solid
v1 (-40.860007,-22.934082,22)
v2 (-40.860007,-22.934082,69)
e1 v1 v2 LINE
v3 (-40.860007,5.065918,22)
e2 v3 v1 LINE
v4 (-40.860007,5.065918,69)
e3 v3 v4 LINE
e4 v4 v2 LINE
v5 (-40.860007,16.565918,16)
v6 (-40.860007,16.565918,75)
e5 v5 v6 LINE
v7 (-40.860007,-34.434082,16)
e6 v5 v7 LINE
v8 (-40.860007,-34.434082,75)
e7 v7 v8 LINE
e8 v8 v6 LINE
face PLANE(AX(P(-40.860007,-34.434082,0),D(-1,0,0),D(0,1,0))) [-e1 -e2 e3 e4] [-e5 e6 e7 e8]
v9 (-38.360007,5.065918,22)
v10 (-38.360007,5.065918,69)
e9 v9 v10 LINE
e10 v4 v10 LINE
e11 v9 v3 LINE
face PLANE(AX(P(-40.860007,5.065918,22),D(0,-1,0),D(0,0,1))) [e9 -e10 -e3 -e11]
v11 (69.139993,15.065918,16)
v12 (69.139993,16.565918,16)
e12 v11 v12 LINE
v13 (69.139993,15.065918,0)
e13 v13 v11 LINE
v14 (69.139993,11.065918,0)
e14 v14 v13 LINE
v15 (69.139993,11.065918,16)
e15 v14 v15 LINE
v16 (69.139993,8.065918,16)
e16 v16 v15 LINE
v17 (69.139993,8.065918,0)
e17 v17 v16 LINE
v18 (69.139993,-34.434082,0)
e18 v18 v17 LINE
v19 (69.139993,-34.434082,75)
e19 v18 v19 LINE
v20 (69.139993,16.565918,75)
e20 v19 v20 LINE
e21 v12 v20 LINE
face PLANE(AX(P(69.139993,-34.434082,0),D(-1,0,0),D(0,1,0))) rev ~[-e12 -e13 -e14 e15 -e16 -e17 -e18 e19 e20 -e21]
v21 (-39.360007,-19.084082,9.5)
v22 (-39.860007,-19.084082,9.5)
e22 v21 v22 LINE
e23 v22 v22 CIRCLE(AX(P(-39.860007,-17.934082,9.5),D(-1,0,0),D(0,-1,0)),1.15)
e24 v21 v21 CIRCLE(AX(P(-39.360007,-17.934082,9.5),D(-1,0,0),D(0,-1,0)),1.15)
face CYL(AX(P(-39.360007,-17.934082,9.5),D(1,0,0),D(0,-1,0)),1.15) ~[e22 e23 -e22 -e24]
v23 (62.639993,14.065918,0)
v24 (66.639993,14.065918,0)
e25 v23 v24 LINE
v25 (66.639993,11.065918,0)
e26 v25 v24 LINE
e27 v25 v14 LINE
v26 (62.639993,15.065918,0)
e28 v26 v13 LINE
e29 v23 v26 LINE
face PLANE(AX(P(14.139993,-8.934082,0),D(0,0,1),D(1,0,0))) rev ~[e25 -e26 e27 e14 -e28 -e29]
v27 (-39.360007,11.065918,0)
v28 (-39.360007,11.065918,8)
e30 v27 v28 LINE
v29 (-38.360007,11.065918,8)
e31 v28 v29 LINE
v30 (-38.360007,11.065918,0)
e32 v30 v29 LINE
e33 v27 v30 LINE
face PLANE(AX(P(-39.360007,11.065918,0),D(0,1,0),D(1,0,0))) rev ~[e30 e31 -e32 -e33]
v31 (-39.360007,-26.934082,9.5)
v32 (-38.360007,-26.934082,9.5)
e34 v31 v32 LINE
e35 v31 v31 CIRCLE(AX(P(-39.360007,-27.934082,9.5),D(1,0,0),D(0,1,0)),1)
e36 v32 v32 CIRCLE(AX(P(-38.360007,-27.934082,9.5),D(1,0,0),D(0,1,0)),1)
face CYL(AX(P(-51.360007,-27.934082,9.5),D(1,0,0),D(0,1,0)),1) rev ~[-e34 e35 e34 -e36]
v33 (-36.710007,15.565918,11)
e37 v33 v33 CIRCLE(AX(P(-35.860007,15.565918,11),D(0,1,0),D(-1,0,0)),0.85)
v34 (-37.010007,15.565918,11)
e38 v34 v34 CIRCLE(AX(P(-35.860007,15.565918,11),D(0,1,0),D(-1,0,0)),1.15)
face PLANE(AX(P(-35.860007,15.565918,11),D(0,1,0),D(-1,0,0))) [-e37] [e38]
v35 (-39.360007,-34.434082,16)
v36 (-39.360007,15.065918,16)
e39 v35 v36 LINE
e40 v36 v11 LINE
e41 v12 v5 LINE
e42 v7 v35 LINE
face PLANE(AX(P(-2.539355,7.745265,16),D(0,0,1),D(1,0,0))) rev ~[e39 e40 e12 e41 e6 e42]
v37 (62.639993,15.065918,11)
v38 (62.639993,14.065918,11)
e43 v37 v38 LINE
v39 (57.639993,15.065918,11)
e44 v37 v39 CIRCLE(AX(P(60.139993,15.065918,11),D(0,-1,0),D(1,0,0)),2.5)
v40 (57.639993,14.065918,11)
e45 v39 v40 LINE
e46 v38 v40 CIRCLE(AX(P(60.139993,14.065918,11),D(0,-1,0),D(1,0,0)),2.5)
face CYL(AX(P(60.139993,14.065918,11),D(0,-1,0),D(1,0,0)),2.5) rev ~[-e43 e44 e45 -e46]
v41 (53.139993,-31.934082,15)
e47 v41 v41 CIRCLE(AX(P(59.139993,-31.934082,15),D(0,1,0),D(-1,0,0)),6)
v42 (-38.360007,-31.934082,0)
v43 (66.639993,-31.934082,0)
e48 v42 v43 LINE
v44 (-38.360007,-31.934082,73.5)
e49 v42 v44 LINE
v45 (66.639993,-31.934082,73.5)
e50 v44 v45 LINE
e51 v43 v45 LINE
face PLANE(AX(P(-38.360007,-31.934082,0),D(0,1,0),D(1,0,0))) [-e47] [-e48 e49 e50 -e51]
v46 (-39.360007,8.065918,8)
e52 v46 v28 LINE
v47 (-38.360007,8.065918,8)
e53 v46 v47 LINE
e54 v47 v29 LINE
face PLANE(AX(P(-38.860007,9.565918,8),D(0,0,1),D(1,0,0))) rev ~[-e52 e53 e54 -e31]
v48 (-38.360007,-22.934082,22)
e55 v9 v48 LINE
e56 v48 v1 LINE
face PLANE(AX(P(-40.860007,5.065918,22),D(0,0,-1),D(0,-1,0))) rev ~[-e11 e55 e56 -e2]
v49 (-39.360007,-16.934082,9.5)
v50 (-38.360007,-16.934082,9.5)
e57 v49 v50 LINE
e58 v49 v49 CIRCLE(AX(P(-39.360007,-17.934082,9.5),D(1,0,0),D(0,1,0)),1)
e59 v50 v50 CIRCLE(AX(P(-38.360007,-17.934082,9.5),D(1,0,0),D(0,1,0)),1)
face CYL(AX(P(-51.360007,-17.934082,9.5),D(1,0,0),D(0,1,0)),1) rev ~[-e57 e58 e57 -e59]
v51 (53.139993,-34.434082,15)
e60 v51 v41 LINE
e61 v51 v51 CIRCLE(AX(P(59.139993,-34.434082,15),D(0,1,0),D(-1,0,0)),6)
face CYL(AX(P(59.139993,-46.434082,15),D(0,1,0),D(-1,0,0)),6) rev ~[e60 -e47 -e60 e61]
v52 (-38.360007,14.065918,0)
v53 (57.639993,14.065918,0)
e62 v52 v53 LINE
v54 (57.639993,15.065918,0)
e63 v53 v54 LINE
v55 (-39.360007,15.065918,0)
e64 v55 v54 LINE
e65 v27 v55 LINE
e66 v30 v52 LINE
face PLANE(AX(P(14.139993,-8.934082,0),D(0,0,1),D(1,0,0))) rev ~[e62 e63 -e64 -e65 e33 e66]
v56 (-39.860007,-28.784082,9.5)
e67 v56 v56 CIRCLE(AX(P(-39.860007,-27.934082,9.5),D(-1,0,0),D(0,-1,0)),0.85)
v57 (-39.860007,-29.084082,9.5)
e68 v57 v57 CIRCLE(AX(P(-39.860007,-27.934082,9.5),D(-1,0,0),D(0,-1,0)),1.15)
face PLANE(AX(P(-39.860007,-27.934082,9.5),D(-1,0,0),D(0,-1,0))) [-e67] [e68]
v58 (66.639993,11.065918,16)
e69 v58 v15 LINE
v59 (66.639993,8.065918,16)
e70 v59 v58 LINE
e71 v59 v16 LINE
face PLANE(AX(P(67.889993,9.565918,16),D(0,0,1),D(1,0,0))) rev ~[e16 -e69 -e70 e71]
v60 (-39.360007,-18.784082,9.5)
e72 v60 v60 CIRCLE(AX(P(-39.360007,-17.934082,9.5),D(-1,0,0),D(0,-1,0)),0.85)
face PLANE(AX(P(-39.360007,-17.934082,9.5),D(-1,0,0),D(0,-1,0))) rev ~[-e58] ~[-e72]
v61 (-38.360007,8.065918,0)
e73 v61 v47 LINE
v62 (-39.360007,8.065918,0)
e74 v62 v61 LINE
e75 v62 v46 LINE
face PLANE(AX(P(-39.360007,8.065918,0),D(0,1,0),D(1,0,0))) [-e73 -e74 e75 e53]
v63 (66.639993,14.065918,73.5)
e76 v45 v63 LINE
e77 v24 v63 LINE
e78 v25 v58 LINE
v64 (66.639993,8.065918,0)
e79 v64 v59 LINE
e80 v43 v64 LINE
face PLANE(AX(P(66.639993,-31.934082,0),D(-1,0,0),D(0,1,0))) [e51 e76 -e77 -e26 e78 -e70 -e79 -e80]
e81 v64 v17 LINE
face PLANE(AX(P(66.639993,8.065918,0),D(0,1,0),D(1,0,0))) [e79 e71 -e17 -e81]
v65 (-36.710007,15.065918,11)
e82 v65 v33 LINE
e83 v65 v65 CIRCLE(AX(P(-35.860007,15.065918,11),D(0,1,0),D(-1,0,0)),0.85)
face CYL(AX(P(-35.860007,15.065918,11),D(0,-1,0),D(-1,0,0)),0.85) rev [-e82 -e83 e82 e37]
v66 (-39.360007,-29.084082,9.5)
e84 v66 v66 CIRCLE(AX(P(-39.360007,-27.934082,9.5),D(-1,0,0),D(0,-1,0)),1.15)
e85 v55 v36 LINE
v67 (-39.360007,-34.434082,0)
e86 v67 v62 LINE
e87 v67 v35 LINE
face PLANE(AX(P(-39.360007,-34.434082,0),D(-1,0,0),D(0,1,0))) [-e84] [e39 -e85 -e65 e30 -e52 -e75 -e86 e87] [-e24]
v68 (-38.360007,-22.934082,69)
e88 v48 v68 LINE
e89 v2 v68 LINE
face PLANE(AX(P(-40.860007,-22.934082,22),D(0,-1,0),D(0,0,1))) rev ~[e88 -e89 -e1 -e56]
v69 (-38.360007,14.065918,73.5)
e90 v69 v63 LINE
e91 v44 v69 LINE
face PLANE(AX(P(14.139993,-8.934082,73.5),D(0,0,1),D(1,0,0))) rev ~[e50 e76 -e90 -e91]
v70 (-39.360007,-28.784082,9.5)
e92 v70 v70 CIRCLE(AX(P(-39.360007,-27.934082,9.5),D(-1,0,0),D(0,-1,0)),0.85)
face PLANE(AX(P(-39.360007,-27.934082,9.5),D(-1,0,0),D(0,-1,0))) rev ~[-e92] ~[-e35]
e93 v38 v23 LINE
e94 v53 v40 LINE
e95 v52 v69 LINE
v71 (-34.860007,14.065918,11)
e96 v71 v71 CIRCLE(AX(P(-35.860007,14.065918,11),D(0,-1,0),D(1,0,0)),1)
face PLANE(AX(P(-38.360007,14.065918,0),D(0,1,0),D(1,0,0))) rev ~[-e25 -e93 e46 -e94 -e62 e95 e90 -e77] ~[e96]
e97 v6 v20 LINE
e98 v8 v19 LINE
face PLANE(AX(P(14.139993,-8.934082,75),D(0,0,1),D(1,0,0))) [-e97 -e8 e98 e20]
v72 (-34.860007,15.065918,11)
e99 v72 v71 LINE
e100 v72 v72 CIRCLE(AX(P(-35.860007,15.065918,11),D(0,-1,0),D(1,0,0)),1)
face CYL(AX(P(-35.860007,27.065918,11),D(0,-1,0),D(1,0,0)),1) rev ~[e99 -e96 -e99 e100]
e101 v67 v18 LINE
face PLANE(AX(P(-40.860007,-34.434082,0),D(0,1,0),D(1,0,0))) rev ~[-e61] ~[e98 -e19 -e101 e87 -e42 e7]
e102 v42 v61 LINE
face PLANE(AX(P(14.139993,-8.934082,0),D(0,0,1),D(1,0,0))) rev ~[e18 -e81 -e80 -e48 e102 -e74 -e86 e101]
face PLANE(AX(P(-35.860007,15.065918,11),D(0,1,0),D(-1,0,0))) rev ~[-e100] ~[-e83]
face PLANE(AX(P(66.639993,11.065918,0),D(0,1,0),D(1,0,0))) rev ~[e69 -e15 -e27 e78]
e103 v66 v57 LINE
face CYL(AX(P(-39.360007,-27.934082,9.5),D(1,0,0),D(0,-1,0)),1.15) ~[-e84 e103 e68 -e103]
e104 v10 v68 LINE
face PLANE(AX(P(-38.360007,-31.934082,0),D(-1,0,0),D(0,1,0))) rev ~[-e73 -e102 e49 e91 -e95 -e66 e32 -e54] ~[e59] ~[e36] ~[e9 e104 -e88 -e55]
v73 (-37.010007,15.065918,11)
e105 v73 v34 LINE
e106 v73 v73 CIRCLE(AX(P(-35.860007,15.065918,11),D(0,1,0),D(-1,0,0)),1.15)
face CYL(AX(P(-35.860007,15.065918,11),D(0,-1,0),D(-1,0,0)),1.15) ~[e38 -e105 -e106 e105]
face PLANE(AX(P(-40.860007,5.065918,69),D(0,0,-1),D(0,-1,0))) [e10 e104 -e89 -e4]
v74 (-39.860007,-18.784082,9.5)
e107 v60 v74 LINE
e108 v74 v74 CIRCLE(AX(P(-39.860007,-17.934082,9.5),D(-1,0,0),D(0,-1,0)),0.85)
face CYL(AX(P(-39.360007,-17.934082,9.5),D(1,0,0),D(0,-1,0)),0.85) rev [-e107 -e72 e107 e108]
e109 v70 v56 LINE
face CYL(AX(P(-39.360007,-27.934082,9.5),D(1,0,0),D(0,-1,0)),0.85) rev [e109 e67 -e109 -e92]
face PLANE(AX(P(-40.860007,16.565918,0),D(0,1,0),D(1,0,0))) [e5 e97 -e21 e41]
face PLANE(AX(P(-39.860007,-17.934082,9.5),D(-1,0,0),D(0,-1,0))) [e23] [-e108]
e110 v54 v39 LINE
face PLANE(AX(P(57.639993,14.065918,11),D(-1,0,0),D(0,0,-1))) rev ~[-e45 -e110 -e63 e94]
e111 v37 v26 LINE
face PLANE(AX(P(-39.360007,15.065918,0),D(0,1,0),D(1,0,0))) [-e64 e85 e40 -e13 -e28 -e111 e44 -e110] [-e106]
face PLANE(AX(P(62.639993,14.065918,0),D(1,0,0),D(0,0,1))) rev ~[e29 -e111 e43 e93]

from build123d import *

# Parameters (mm, degrees)
F0_W      = 110
F0_H      = 51
F0_W_2    = 105
F0_H_2    = 46
F1_DEPTH  = 75
F3_DEPTH  = 16
F5_W      = 1
F5_H      = 3
F6_DEPTH  = 8
F8_W      = 2.5
F8_H      = 3
F9_DEPTH  = 16
F12_DEPTH = 5
F15_D     = 2
F15_DEPTH = 12
F15_TIP   = 0.600860619
F16_W     = 28
F16_H     = 47
F17_DEPTH = 12.5
F19_W     = 105
F19_H     = 46
F20_DEPTH = 1.5
F22_D     = 12
F22_DEPTH = 12
F22_TIP   = 3.6051637142
F14_R     = 1.15
F14_R_2   = 0.85
F23_DEPTH = 0.5
F25_D     = 2
F25_DEPTH = 12
F25_TIP   = 0.600860619
F24_R     = 1.15
F24_R_2   = 0.85
F26_DEPTH = 0.5


# Not quite as in the source:
# - a feature names something its author has since deleted; it is built from what else it names


with BuildPart() as f1:
    # F0 (on Top) → F1 (new body)
    with BuildSketch(Plane.XY):
        with Locations((14.1399928927, -8.9340824737)):
            Rectangle(F0_W, F0_H)
        with Locations((14.1399928927, -8.9340824737)):
            Rectangle(F0_W_2, F0_H_2, mode=Mode.SUBTRACT)
    extrude(amount=F1_DEPTH)


with BuildPart() as f3:
    # F2 (on face) → F3 (new body)
    with BuildSketch(Plane.XY):
        Polygon((-39.3600071073, -34.4340824737), (-39.3600071073, 15.0659175263), (69.1399928927, 15.0659175263), (69.1399928927, 16.5659175263), (-40.8600071073, 16.5659175263), (-40.8600071073, -34.4340824737), align=None)
    extrude(amount=F3_DEPTH)


with BuildPart() as f1_1:
    add(f1.part)

    # F4: cut F3
    add(f3.part, mode=Mode.SUBTRACT)


with BuildPart() as f6:
    # F5 (on face) → F6 (new body)
    with BuildSketch(Plane.XY):
        with Locations((-38.8600071073, 9.5659175263)):
            Rectangle(F5_W, F5_H)
    extrude(amount=F6_DEPTH)


with BuildPart() as f1_2:
    add(f1_1.part)

    # F7: cut F6
    add(f6.part, mode=Mode.SUBTRACT)


with BuildPart() as f9:
    # F8 (on face) → F9 (new body)
    with BuildSketch(Plane.XY):
        with Locations((67.8899928927, 9.5659175263)):
            Rectangle(F8_W, F8_H)
    extrude(amount=F9_DEPTH)


with BuildPart() as f1_3:
    add(f1_2.part)

    # F10: cut F9
    add(f9.part, mode=Mode.SUBTRACT)


with BuildPart() as f12:
    # F11 (on face) → F12 (new body, symmetric)
    with BuildSketch(Plane.XZ.offset(-14.0659175263)):
        with BuildLine():
            Line((62.6399928927, 0), (62.6399928927, 11))
            ThreePointArc((62.6399928927, 11), (60.1399928927, 8.5), (57.6399928927, 11))
            Line((57.6399928927, 11), (57.6399928927, 0))
            Line((57.6399928927, 0), (62.6399928927, 0))
        make_face()
        with BuildLine():
            ThreePointArc((57.6399928927, 11), (60.1399928927, 8.5), (62.6399928927, 11))
            ThreePointArc((62.6399928927, 11), (60.1399928927, 13.5), (57.6399928927, 11))
        make_face()
    extrude(amount=F12_DEPTH, both=True)


with BuildPart() as f1_4:
    add(f1_3.part)

    # F13: cut F12
    add(f12.part, mode=Mode.SUBTRACT)

    # F15
    with Locations(Plane(origin=(-39.3600071073, 0, 0), x_dir=(0, -1, 0), z_dir=(-1, 0, 0))):
        with Locations((27.9340824737, 9.5), (17.9340824737, 9.5)):
            Hole(F15_D / 2, depth=F15_DEPTH)
            with Locations((0, 0, -(F15_DEPTH + F15_TIP / 2))):  # 118° drill point
                Cone(0, F15_D / 2, F15_TIP, mode=Mode.SUBTRACT)


with BuildPart() as f17:
    # F16 (on face) → F17 (new body, symmetric)
    with BuildSketch(Plane(origin=(-40.8600071073, 0, 0), x_dir=(0, -1, 0), z_dir=(-1, 0, 0))):
        with Locations((8.9340824737, 45.5)):
            Rectangle(F16_W, F16_H)
    extrude(amount=F17_DEPTH, both=True)


with BuildPart() as f1_5:
    add(f1_4.part)

    # F18: cut F17
    add(f17.part, mode=Mode.SUBTRACT)

    # F19 (on face) → F20 (join)
    with BuildSketch(Plane.XY.offset(75)):
        with Locations((14.1399928927, -8.9340824737)):
            Rectangle(F19_W, F19_H)
    extrude(amount=-F20_DEPTH)

    # F22
    with Locations(Plane.XZ.offset(34.4340824737)):
        with Locations((59.1399928927, 15)):
            Hole(F22_D / 2, depth=F22_DEPTH)
            with Locations((0, 0, -(F22_DEPTH + F22_TIP / 2))):  # 118° drill point
                Cone(0, F22_D / 2, F22_TIP, mode=Mode.SUBTRACT)

    # F14 (on face) → F23 (join)
    with BuildSketch(Plane(origin=(-39.3600071073, 0, 0), x_dir=(0, -1, 0), z_dir=(-1, 0, 0))):
        with Locations((27.9340824737, 9.5)):
            Circle(F14_R)
        with Locations((27.9340824737, 9.5)):
            Circle(F14_R_2, mode=Mode.SUBTRACT)
        with Locations((17.9340824737, 9.5)):
            Circle(F14_R)
        with Locations((17.9340824737, 9.5)):
            Circle(F14_R_2, mode=Mode.SUBTRACT)
    extrude(amount=F23_DEPTH)

    # F25
    with Locations(Plane(origin=(0, 15.0659175263, 0), x_dir=(-1, 0, 0), z_dir=(0, 1, 0))):
        with Locations((35.8600071073, 11)):
            Hole(F25_D / 2, depth=F25_DEPTH)
            with Locations((0, 0, -(F25_DEPTH + F25_TIP / 2))):  # 118° drill point
                Cone(0, F25_D / 2, F25_TIP, mode=Mode.SUBTRACT)

    # F24 (on face) → F26 (join)
    with BuildSketch(Plane(origin=(0, 15.0659175263, 0), x_dir=(-1, 0, 0), z_dir=(0, 1, 0))):
        with Locations((35.8600071073, 11)):
            Circle(F24_R)
        with Locations((35.8600071073, 11)):
            Circle(F24_R_2, mode=Mode.SUBTRACT)
    extrude(amount=F26_DEPTH)


solid = f1_5.part
